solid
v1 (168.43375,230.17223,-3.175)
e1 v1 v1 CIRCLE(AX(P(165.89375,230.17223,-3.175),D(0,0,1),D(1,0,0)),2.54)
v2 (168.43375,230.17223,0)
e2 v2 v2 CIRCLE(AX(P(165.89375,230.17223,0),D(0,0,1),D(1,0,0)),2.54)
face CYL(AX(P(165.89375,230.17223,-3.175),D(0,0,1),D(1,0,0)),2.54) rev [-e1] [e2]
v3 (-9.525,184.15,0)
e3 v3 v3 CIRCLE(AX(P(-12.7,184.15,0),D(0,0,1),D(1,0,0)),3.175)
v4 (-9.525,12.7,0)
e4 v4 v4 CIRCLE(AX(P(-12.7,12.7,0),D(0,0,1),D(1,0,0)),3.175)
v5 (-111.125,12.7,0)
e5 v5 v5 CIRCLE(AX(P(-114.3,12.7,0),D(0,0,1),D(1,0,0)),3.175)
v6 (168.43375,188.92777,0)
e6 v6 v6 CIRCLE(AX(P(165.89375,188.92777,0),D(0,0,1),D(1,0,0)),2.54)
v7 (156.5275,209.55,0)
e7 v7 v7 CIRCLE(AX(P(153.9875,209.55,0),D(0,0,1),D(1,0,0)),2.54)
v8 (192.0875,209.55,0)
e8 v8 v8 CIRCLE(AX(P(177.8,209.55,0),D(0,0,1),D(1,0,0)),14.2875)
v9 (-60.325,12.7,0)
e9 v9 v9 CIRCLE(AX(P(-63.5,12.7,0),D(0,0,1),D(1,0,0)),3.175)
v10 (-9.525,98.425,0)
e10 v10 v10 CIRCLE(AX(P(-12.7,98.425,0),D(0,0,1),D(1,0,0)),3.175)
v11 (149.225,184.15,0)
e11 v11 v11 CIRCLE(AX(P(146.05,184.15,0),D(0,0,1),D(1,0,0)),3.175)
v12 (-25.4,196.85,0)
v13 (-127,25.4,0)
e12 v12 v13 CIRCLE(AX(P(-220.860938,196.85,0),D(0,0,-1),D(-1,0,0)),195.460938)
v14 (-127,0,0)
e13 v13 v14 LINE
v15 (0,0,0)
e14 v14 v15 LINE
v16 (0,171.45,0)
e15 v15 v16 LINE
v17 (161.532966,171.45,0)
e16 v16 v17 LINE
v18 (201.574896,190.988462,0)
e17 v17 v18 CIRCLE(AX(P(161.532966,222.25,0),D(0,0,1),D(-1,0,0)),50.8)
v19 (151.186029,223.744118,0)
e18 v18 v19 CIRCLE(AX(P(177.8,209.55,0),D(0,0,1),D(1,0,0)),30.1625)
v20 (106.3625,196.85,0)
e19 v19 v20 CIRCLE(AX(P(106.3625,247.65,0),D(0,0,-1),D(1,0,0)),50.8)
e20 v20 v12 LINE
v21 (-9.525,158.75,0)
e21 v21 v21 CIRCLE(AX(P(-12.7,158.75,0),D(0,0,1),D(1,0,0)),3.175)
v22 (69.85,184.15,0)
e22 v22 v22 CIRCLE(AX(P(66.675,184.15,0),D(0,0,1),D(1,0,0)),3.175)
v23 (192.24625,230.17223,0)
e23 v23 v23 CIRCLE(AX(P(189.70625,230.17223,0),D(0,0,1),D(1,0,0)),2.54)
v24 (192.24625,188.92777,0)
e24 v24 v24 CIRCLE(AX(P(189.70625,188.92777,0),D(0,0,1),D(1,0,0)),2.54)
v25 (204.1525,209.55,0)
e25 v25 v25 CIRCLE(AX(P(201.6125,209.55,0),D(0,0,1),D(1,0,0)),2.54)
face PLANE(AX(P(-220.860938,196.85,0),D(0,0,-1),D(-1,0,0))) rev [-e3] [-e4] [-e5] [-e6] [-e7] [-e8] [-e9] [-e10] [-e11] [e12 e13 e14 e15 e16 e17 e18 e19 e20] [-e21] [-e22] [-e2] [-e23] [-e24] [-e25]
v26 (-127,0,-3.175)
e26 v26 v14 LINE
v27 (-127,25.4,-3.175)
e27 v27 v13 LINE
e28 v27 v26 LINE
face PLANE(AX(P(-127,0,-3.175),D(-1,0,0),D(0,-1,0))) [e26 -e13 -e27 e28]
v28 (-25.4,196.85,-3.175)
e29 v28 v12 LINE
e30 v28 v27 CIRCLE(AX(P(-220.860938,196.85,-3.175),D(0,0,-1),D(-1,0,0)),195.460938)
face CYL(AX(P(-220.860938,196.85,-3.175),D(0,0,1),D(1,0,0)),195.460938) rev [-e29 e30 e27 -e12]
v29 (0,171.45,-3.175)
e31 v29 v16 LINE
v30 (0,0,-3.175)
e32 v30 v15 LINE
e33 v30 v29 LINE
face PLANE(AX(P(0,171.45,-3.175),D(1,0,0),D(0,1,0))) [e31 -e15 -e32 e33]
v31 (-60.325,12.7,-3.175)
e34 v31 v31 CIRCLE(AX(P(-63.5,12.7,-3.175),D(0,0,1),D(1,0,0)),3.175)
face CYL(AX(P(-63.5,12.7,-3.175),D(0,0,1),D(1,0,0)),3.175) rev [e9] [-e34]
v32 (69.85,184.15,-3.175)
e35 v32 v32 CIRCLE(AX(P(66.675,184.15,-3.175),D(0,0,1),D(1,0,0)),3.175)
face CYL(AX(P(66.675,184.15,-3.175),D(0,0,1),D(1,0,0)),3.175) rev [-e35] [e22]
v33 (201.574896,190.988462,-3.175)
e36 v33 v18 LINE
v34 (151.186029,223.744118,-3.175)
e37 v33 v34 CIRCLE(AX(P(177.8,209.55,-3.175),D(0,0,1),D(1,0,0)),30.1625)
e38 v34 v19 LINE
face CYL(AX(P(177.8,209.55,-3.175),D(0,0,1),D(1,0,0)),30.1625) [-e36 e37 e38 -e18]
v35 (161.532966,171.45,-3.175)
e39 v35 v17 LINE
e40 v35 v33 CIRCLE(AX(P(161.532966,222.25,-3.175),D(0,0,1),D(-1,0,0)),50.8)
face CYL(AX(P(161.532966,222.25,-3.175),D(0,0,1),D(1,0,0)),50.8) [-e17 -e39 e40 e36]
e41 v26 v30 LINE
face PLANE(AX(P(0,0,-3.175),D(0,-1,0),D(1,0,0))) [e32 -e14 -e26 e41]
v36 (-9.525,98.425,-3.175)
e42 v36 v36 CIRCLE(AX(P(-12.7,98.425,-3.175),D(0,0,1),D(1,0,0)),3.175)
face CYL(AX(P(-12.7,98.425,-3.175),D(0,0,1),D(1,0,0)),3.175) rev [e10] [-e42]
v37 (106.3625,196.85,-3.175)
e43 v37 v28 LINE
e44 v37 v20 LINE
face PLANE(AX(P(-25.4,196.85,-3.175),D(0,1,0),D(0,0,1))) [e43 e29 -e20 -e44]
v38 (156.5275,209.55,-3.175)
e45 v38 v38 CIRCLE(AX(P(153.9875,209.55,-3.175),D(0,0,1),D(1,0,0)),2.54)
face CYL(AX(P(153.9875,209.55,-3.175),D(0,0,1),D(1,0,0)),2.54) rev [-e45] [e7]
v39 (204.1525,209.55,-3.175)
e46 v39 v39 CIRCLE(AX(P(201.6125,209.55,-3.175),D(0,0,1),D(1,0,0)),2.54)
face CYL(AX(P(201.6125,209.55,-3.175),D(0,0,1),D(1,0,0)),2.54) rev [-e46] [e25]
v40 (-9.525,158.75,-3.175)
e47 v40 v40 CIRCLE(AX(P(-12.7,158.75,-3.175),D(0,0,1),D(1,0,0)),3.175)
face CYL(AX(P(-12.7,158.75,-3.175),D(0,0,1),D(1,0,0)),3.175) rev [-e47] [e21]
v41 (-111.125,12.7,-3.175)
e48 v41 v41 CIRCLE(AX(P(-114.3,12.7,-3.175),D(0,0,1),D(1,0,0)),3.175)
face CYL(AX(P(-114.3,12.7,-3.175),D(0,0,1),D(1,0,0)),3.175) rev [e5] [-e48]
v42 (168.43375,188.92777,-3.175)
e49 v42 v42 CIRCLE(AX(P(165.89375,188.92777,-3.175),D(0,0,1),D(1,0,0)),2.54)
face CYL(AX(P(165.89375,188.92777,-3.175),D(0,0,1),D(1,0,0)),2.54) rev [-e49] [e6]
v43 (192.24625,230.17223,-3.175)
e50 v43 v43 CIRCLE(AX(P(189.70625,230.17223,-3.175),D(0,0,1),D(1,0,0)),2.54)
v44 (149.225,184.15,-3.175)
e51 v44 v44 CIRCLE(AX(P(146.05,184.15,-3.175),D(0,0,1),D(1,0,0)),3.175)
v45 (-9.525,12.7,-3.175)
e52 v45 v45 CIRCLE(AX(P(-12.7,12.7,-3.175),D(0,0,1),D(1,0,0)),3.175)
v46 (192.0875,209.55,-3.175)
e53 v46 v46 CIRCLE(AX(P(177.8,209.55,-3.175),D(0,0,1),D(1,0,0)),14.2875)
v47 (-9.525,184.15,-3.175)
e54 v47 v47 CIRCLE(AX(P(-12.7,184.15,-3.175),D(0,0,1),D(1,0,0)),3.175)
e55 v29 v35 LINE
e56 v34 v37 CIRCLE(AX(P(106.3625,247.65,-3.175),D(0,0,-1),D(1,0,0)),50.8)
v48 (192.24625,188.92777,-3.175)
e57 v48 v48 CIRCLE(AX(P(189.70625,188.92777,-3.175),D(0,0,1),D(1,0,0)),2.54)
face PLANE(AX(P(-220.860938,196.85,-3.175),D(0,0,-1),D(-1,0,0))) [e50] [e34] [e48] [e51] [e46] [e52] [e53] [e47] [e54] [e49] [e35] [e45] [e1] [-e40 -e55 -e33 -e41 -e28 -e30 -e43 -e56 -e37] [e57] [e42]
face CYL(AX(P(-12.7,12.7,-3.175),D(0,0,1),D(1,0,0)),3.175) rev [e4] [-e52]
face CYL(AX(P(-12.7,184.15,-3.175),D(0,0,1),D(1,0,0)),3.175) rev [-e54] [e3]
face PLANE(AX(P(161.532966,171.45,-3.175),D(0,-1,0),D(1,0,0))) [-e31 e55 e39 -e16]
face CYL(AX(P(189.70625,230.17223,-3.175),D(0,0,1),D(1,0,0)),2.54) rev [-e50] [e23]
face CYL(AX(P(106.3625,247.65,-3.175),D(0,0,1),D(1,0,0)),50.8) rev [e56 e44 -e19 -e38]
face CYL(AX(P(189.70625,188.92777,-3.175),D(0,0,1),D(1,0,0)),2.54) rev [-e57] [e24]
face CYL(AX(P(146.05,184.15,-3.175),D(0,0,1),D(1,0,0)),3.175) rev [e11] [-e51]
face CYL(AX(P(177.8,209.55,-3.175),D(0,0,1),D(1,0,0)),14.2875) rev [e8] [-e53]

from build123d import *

# Parameters (mm, degrees)
SKETCH1_R          = 3.175
SKETCH1_R_2        = 14.2875
SKETCH1_R_3        = 2.54
BASE_FLANGE1_DEPTH = 3.175


# Sheet-metal steps are written as plain solids
with BuildPart() as part:
    # Sketch1 → Base-Flange1 (new body)
    with BuildSketch(Plane.XY):
        with BuildLine():
            Line((0, 0), (-127, 0))
            Line((-127, 0), (-127, 25.4))
            ThreePointArc((-127, 25.4), (-52.707547813, 97.203546852), (-25.4, 196.85))
            Line((-25.4, 196.85), (0, 196.85))
            Line((0, 196.85), (106.3625, 196.85))
            ThreePointArc((106.3625, 196.85), (132.498884376, 204.089359374), (151.186029412, 223.744117647))
            ThreePointArc((151.186029412, 223.744117647), (194.239231655, 234.838892203), (201.574896344, 190.988461538))
            ThreePointArc((201.574896344, 190.988461538), (183.810239349, 176.595174659), (161.532965659, 171.45))
            Line((161.532965659, 171.45), (0, 171.45))
            Line((0, 171.45), (0, 0))
        make_face()
        with Locations((-12.7, 12.7)):
            Circle(SKETCH1_R, mode=Mode.SUBTRACT)
        with Locations((-12.7, 184.15)):
            Circle(SKETCH1_R, mode=Mode.SUBTRACT)
        with Locations((-114.3, 12.7)):
            Circle(SKETCH1_R, mode=Mode.SUBTRACT)
        with Locations((-63.5, 12.7)):
            Circle(SKETCH1_R, mode=Mode.SUBTRACT)
        with Locations((-12.7, 98.425)):
            Circle(SKETCH1_R, mode=Mode.SUBTRACT)
        with Locations((177.8, 209.55)):
            Circle(SKETCH1_R_2, mode=Mode.SUBTRACT)
        with Locations((201.6125, 209.55)):
            Circle(SKETCH1_R_3, mode=Mode.SUBTRACT)
        with Locations((189.70625, 188.927770072)):
            Circle(SKETCH1_R_3, mode=Mode.SUBTRACT)
        with Locations((165.89375, 188.927770072)):
            Circle(SKETCH1_R_3, mode=Mode.SUBTRACT)
        with Locations((153.9875, 209.55)):
            Circle(SKETCH1_R_3, mode=Mode.SUBTRACT)
        with Locations((165.89375, 230.172229928)):
            Circle(SKETCH1_R_3, mode=Mode.SUBTRACT)
        with Locations((189.70625, 230.172229928)):
            Circle(SKETCH1_R_3, mode=Mode.SUBTRACT)
        with Locations((66.675, 184.15)):
            Circle(SKETCH1_R, mode=Mode.SUBTRACT)
        with Locations((-12.7, 158.75)):
            Circle(SKETCH1_R, mode=Mode.SUBTRACT)
        with Locations((146.05, 184.15)):
            Circle(SKETCH1_R, mode=Mode.SUBTRACT)
    extrude(amount=-BASE_FLANGE1_DEPTH)


solid = part.part
